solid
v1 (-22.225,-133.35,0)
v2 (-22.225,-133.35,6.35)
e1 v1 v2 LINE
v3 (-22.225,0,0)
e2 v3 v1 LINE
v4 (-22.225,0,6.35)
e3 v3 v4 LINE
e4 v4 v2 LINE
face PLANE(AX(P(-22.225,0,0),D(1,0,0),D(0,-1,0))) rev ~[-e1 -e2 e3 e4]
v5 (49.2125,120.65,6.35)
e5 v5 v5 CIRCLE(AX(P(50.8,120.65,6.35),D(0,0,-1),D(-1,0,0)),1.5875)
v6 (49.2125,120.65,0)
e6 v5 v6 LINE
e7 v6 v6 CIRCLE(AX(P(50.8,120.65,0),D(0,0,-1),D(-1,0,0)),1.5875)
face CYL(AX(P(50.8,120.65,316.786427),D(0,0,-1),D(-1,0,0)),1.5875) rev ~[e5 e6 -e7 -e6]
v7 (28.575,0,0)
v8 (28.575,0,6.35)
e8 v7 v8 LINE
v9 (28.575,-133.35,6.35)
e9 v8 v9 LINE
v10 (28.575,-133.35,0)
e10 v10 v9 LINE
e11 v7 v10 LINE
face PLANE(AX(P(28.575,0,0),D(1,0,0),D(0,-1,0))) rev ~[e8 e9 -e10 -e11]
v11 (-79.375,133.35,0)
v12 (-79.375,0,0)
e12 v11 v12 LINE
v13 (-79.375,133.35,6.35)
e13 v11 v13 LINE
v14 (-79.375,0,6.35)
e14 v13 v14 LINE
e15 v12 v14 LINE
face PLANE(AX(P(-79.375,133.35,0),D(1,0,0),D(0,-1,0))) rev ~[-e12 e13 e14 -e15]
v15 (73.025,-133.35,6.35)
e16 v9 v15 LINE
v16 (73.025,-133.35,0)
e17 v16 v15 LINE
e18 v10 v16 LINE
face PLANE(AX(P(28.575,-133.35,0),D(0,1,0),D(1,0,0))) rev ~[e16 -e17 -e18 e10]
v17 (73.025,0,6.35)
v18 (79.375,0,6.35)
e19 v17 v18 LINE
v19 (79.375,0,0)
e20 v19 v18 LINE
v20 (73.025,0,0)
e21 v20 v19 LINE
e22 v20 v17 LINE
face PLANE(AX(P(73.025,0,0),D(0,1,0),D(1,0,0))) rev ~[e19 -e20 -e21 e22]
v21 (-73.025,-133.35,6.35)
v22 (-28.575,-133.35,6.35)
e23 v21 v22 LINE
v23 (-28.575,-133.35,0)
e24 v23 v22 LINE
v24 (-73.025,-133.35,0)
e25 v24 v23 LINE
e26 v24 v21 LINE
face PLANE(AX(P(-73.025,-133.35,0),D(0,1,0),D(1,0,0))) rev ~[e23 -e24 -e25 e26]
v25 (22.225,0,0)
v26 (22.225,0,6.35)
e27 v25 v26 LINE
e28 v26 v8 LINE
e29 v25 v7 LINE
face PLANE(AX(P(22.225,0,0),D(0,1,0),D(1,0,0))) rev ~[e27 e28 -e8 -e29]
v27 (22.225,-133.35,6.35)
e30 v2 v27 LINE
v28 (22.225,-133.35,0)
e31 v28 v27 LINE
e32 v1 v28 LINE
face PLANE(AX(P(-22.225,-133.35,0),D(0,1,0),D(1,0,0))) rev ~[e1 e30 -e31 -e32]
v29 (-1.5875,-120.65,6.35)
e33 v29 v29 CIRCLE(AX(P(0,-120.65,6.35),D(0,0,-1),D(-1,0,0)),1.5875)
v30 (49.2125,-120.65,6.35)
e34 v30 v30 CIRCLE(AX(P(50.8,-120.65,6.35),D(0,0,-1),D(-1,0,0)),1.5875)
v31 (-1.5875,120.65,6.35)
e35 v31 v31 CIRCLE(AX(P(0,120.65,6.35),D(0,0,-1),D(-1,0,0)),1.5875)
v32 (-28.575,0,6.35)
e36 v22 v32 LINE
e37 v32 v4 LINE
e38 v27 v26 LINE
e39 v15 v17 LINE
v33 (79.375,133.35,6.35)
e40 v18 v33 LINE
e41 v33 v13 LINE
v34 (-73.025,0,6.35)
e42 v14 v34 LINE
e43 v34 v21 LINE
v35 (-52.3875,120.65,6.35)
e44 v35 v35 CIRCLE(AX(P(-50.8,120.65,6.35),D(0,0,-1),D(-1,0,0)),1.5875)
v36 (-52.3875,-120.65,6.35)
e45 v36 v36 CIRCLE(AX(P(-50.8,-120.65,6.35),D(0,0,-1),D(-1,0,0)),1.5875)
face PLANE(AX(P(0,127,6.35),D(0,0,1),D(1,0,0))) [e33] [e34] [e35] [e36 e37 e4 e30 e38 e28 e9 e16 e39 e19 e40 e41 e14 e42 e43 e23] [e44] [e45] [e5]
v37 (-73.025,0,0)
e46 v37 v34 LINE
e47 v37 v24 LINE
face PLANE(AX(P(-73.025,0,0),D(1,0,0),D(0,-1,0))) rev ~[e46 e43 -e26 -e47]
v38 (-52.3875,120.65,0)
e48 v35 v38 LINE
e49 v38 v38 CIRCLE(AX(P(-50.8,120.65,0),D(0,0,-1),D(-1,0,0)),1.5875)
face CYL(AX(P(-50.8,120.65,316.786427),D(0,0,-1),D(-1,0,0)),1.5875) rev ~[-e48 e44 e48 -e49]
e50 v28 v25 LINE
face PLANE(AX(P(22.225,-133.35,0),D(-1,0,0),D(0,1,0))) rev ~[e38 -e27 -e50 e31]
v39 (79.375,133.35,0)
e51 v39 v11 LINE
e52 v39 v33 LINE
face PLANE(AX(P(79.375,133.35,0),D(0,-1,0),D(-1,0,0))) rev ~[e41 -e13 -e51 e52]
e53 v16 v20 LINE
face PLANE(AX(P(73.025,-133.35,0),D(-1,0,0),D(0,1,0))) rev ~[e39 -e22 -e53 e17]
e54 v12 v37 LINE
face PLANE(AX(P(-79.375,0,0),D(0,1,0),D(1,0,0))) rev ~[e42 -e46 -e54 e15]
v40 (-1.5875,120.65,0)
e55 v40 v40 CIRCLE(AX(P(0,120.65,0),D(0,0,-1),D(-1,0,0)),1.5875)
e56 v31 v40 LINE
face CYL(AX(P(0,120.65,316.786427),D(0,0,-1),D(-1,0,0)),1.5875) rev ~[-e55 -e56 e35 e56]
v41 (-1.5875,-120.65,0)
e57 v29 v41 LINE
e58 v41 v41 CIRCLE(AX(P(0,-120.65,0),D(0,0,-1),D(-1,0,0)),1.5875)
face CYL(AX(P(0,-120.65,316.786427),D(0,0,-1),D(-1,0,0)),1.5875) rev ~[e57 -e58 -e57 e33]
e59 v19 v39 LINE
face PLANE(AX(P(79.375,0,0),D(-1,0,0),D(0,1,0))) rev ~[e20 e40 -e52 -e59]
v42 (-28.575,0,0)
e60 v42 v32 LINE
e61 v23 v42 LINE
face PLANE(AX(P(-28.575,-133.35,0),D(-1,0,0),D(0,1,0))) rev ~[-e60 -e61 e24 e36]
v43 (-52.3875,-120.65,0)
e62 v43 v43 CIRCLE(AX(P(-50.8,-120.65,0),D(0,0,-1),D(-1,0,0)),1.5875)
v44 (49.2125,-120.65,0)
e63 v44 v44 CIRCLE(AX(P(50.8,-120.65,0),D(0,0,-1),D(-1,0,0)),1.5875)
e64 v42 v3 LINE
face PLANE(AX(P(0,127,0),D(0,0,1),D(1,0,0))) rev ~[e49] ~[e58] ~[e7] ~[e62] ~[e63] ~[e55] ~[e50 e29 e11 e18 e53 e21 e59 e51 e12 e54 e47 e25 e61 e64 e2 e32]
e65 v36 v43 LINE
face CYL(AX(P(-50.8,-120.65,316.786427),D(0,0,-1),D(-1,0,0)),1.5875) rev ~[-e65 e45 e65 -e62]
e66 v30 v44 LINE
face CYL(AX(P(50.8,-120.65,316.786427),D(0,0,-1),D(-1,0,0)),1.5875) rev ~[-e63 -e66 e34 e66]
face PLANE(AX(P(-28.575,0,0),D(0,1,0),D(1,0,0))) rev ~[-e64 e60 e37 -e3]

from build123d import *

# Parameters (mm, degrees)
F0_W     = 22.225
F0_H     = 120.65
F1_DEPTH = 6.35
F3_D     = 3.175


# Not quite as in the source:
# - a feature names something its author has since deleted; it is built from what else it names


with BuildPart() as f1:
    # F0 (on Top) → F1 (new body)
    with BuildSketch(Plane.XY):
        Polygon((73.025, 133.35), (-73.025, 133.35), (-73.025, 120.65), (-50.8, 120.65), (0, 120.65), (50.8, 120.65), (73.025, 120.65), align=None)
        Polygon((-50.8, -120.65), (-73.025, -120.65), (-73.025, -133.35), (-28.575, -133.35), (-28.575, -120.65), align=None)
        Polygon((73.025, -133.35), (73.025, -120.65), (50.8, -120.65), (28.575, -120.65), (28.575, -133.35), align=None)
        with Locations((-61.9125, 60.325)):
            Rectangle(F0_W, F0_H)
        with Locations((-61.9125, -60.325)):
            Rectangle(F0_W, F0_H)
        with Locations((61.9125, 60.325)):
            Rectangle(F0_W, F0_H)
        with Locations((61.9125, -60.325)):
            Rectangle(F0_W, F0_H)
        Polygon((50.8, 0), (50.8, 120.65), (0, 120.65), (0, 0), (22.225, 0), (28.575, 0), align=None)
        Polygon((22.225, -120.65), (0, -120.65), (-22.225, -120.65), (-22.225, -133.35), (22.225, -133.35), align=None)
        Polygon((0, 120.65), (-50.8, 120.65), (-50.8, 0), (-28.575, 0), (-22.225, 0), (0, 0), align=None)
        with Locations((-39.6875, -60.325)):
            Rectangle(F0_W, F0_H)
        with Locations((-11.1125, -60.325)):
            Rectangle(F0_W, F0_H)
        with Locations((11.1125, -60.325)):
            Rectangle(F0_W, F0_H)
        with Locations((39.6875, -60.325)):
            Rectangle(F0_W, F0_H)
        Polygon((79.375, 133.35), (73.025, 133.35), (73.025, 120.65), (73.025, 0), (79.375, 0), align=None)
        Polygon((-73.025, 120.65), (-73.025, 133.35), (-79.375, 133.35), (-79.375, 0), (-73.025, 0), align=None)
    extrude(amount=F1_DEPTH)

    # F3 (through all)
    with Locations(Plane.XY.offset(6.35)):
        with Locations((-50.8, 120.65), (0, 120.65), (50.8, 120.65), (50.8, -120.65), (0, -120.65), (-50.8, -120.65)):
            Hole(F3_D / 2)


solid = f1.part
